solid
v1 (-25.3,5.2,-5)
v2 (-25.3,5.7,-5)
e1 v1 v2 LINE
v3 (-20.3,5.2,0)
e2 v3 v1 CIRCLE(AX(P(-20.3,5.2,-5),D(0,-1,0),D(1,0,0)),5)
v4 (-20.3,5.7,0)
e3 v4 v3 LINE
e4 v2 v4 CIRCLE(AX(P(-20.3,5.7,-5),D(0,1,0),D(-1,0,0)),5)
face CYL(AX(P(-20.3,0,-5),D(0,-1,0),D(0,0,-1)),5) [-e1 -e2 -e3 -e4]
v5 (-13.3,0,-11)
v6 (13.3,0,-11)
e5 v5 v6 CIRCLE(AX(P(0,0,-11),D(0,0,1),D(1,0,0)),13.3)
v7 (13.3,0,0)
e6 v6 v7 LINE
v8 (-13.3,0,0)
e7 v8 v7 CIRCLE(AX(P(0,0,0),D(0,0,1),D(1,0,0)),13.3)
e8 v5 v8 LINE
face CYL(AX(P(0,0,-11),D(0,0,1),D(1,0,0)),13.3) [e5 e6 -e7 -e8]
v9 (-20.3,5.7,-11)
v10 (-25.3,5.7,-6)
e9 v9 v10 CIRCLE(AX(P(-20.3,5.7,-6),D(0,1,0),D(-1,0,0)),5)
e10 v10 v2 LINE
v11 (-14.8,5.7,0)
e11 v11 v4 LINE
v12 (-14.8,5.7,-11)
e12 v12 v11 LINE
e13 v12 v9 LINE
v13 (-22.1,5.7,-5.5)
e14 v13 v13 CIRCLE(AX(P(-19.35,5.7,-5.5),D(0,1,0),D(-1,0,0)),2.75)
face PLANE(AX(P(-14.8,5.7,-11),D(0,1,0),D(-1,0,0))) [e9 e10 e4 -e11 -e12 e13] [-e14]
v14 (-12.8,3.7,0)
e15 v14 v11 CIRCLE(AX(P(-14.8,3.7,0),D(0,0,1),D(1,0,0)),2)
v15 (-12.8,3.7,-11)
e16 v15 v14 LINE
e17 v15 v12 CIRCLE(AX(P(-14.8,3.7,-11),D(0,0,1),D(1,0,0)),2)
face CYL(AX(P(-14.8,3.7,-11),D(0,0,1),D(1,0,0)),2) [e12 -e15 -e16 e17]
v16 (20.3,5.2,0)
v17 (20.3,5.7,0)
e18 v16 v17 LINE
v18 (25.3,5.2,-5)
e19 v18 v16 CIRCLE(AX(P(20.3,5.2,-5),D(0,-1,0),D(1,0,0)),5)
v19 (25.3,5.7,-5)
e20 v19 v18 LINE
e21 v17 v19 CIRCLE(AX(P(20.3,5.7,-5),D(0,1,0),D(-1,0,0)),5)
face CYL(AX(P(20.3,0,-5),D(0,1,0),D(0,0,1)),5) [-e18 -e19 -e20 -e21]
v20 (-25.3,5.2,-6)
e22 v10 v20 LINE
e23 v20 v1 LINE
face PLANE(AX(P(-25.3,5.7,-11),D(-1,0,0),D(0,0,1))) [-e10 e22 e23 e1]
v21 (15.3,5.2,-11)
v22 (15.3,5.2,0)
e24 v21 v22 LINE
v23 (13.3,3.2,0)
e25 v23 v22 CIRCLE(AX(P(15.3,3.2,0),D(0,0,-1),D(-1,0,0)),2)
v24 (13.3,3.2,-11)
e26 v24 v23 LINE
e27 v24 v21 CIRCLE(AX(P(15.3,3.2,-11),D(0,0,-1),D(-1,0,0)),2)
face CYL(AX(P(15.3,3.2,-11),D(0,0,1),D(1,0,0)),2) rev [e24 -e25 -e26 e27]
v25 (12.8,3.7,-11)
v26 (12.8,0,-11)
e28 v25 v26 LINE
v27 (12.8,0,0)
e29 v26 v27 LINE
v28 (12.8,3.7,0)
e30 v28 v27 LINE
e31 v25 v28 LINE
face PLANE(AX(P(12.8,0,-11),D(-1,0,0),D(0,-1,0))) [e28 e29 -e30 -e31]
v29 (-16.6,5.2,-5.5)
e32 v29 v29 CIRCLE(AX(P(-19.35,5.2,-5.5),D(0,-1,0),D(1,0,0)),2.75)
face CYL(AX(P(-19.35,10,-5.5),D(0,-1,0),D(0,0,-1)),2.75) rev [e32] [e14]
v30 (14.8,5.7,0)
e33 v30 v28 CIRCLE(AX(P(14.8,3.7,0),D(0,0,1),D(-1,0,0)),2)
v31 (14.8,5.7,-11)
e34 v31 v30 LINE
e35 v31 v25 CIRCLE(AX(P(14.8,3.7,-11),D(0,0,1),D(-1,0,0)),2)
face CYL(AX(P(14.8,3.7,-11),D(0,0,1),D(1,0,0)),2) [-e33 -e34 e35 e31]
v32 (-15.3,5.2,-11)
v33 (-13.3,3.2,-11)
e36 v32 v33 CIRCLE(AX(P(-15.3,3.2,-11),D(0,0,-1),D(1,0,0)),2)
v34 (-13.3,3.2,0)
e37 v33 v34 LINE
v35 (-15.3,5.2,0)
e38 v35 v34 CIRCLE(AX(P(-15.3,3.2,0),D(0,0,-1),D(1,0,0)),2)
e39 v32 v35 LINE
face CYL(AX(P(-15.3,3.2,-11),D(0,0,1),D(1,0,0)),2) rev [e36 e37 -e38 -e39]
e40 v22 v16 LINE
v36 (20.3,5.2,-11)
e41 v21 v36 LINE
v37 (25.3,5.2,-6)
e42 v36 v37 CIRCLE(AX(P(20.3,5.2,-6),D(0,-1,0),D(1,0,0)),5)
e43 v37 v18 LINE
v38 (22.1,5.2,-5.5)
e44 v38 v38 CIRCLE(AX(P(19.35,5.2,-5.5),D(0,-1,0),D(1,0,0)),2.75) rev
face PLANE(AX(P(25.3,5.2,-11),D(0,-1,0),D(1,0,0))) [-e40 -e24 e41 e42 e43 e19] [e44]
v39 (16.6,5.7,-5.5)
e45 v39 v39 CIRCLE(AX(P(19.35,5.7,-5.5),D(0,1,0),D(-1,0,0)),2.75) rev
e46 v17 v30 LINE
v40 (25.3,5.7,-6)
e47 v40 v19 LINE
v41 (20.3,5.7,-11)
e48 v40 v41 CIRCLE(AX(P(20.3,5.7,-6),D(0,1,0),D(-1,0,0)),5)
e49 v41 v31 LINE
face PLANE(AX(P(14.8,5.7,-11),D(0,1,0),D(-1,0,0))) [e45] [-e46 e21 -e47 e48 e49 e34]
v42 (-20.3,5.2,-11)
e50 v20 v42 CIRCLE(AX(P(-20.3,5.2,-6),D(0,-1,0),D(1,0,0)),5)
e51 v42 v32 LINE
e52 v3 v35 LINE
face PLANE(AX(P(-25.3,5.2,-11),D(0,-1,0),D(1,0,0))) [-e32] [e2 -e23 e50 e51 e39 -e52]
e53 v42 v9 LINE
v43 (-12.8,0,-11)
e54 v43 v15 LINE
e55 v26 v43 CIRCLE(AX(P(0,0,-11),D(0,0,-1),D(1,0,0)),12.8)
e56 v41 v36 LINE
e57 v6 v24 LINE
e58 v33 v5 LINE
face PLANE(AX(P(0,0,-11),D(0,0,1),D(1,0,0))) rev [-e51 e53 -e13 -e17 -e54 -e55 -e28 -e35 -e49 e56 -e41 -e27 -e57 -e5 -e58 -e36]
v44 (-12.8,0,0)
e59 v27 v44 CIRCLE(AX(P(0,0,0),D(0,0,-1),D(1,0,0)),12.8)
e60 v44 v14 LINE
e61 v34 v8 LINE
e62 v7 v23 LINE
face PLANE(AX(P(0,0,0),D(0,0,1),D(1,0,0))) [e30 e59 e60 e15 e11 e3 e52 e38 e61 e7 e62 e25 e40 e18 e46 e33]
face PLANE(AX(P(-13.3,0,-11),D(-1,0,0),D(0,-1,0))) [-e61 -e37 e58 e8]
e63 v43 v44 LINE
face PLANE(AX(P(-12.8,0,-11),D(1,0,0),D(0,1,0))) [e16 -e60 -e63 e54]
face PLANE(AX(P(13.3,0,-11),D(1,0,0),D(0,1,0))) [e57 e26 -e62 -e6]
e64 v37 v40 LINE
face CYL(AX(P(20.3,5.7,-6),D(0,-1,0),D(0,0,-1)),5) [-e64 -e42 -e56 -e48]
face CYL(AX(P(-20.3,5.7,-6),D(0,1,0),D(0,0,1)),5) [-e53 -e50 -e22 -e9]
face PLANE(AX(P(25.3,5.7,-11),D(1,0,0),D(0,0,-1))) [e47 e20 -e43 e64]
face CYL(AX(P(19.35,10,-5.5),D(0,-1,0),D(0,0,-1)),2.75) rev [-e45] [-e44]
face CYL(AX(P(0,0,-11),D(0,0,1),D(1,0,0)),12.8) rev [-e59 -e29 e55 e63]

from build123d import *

# Parameters (mm, degrees)
BASE_FLANGE1_DEPTH = 11
FILLET1_R          = 5
SKETCH6_R          = 2.75
CUT_EXTRUDE1_DEPTH = 10


# Sheet-metal steps are written as plain solids
with BuildPart() as part:
    # Sketch1 → Base-Flange1 (new body)
    with BuildSketch(Plane.XY):
        with BuildLine():
            Line((-12.8, 0), (-12.8, 3.7))
            ThreePointArc((-12.8, 3.7), (-13.385786438, 5.114213562), (-14.8, 5.7))
            Line((-14.8, 5.7), (-25.3, 5.7))
            Line((-25.3, 5.7), (-25.3, 5.2))
            Line((-25.3, 5.2), (-15.3, 5.2))
            ThreePointArc((-15.3, 5.2), (-13.885786438, 4.614213562), (-13.3, 3.2))
            Line((-13.3, 3.2), (-13.3, 0))
            ThreePointArc((-13.3, 0), (0, -13.3), (13.3, 0))
            Line((13.3, 0), (13.3, 3.2))
            ThreePointArc((13.3, 3.2), (13.885786438, 4.614213562), (15.3, 5.2))
            Line((15.3, 5.2), (25.3, 5.2))
            Line((25.3, 5.2), (25.3, 5.7))
            Line((25.3, 5.7), (14.8, 5.7))
            ThreePointArc((14.8, 5.7), (13.385786438, 5.114213562), (12.8, 3.7))
            Line((12.8, 3.7), (12.8, 0))
            ThreePointArc((12.8, 0), (0, -12.8), (-12.8, 0))
        make_face()
    extrude(amount=-BASE_FLANGE1_DEPTH)

    # Fillet1
    fillet1_edges = [part.edges().sort_by_distance(p)[0] for p in [
        (25.3, 5.45, 0),
        (-25.3, 5.45, 0),
        (-25.3, 5.45, -11),
        (25.3, 5.45, -11),
    ]]
    fillet(fillet1_edges, radius=FILLET1_R)

    # Sketch6 → Cut-Extrude1 (cut)
    with BuildSketch(Plane(origin=(0, 0, 0), x_dir=(1, 0, 0), z_dir=(0, 1, 0))):
        with Locations((19.35, 5.5)):
            Circle(SKETCH6_R)
        with Locations((-19.35, 5.5)):
            Circle(SKETCH6_R)
    extrude(amount=CUT_EXTRUDE1_DEPTH, mode=Mode.SUBTRACT)


solid = part.part
